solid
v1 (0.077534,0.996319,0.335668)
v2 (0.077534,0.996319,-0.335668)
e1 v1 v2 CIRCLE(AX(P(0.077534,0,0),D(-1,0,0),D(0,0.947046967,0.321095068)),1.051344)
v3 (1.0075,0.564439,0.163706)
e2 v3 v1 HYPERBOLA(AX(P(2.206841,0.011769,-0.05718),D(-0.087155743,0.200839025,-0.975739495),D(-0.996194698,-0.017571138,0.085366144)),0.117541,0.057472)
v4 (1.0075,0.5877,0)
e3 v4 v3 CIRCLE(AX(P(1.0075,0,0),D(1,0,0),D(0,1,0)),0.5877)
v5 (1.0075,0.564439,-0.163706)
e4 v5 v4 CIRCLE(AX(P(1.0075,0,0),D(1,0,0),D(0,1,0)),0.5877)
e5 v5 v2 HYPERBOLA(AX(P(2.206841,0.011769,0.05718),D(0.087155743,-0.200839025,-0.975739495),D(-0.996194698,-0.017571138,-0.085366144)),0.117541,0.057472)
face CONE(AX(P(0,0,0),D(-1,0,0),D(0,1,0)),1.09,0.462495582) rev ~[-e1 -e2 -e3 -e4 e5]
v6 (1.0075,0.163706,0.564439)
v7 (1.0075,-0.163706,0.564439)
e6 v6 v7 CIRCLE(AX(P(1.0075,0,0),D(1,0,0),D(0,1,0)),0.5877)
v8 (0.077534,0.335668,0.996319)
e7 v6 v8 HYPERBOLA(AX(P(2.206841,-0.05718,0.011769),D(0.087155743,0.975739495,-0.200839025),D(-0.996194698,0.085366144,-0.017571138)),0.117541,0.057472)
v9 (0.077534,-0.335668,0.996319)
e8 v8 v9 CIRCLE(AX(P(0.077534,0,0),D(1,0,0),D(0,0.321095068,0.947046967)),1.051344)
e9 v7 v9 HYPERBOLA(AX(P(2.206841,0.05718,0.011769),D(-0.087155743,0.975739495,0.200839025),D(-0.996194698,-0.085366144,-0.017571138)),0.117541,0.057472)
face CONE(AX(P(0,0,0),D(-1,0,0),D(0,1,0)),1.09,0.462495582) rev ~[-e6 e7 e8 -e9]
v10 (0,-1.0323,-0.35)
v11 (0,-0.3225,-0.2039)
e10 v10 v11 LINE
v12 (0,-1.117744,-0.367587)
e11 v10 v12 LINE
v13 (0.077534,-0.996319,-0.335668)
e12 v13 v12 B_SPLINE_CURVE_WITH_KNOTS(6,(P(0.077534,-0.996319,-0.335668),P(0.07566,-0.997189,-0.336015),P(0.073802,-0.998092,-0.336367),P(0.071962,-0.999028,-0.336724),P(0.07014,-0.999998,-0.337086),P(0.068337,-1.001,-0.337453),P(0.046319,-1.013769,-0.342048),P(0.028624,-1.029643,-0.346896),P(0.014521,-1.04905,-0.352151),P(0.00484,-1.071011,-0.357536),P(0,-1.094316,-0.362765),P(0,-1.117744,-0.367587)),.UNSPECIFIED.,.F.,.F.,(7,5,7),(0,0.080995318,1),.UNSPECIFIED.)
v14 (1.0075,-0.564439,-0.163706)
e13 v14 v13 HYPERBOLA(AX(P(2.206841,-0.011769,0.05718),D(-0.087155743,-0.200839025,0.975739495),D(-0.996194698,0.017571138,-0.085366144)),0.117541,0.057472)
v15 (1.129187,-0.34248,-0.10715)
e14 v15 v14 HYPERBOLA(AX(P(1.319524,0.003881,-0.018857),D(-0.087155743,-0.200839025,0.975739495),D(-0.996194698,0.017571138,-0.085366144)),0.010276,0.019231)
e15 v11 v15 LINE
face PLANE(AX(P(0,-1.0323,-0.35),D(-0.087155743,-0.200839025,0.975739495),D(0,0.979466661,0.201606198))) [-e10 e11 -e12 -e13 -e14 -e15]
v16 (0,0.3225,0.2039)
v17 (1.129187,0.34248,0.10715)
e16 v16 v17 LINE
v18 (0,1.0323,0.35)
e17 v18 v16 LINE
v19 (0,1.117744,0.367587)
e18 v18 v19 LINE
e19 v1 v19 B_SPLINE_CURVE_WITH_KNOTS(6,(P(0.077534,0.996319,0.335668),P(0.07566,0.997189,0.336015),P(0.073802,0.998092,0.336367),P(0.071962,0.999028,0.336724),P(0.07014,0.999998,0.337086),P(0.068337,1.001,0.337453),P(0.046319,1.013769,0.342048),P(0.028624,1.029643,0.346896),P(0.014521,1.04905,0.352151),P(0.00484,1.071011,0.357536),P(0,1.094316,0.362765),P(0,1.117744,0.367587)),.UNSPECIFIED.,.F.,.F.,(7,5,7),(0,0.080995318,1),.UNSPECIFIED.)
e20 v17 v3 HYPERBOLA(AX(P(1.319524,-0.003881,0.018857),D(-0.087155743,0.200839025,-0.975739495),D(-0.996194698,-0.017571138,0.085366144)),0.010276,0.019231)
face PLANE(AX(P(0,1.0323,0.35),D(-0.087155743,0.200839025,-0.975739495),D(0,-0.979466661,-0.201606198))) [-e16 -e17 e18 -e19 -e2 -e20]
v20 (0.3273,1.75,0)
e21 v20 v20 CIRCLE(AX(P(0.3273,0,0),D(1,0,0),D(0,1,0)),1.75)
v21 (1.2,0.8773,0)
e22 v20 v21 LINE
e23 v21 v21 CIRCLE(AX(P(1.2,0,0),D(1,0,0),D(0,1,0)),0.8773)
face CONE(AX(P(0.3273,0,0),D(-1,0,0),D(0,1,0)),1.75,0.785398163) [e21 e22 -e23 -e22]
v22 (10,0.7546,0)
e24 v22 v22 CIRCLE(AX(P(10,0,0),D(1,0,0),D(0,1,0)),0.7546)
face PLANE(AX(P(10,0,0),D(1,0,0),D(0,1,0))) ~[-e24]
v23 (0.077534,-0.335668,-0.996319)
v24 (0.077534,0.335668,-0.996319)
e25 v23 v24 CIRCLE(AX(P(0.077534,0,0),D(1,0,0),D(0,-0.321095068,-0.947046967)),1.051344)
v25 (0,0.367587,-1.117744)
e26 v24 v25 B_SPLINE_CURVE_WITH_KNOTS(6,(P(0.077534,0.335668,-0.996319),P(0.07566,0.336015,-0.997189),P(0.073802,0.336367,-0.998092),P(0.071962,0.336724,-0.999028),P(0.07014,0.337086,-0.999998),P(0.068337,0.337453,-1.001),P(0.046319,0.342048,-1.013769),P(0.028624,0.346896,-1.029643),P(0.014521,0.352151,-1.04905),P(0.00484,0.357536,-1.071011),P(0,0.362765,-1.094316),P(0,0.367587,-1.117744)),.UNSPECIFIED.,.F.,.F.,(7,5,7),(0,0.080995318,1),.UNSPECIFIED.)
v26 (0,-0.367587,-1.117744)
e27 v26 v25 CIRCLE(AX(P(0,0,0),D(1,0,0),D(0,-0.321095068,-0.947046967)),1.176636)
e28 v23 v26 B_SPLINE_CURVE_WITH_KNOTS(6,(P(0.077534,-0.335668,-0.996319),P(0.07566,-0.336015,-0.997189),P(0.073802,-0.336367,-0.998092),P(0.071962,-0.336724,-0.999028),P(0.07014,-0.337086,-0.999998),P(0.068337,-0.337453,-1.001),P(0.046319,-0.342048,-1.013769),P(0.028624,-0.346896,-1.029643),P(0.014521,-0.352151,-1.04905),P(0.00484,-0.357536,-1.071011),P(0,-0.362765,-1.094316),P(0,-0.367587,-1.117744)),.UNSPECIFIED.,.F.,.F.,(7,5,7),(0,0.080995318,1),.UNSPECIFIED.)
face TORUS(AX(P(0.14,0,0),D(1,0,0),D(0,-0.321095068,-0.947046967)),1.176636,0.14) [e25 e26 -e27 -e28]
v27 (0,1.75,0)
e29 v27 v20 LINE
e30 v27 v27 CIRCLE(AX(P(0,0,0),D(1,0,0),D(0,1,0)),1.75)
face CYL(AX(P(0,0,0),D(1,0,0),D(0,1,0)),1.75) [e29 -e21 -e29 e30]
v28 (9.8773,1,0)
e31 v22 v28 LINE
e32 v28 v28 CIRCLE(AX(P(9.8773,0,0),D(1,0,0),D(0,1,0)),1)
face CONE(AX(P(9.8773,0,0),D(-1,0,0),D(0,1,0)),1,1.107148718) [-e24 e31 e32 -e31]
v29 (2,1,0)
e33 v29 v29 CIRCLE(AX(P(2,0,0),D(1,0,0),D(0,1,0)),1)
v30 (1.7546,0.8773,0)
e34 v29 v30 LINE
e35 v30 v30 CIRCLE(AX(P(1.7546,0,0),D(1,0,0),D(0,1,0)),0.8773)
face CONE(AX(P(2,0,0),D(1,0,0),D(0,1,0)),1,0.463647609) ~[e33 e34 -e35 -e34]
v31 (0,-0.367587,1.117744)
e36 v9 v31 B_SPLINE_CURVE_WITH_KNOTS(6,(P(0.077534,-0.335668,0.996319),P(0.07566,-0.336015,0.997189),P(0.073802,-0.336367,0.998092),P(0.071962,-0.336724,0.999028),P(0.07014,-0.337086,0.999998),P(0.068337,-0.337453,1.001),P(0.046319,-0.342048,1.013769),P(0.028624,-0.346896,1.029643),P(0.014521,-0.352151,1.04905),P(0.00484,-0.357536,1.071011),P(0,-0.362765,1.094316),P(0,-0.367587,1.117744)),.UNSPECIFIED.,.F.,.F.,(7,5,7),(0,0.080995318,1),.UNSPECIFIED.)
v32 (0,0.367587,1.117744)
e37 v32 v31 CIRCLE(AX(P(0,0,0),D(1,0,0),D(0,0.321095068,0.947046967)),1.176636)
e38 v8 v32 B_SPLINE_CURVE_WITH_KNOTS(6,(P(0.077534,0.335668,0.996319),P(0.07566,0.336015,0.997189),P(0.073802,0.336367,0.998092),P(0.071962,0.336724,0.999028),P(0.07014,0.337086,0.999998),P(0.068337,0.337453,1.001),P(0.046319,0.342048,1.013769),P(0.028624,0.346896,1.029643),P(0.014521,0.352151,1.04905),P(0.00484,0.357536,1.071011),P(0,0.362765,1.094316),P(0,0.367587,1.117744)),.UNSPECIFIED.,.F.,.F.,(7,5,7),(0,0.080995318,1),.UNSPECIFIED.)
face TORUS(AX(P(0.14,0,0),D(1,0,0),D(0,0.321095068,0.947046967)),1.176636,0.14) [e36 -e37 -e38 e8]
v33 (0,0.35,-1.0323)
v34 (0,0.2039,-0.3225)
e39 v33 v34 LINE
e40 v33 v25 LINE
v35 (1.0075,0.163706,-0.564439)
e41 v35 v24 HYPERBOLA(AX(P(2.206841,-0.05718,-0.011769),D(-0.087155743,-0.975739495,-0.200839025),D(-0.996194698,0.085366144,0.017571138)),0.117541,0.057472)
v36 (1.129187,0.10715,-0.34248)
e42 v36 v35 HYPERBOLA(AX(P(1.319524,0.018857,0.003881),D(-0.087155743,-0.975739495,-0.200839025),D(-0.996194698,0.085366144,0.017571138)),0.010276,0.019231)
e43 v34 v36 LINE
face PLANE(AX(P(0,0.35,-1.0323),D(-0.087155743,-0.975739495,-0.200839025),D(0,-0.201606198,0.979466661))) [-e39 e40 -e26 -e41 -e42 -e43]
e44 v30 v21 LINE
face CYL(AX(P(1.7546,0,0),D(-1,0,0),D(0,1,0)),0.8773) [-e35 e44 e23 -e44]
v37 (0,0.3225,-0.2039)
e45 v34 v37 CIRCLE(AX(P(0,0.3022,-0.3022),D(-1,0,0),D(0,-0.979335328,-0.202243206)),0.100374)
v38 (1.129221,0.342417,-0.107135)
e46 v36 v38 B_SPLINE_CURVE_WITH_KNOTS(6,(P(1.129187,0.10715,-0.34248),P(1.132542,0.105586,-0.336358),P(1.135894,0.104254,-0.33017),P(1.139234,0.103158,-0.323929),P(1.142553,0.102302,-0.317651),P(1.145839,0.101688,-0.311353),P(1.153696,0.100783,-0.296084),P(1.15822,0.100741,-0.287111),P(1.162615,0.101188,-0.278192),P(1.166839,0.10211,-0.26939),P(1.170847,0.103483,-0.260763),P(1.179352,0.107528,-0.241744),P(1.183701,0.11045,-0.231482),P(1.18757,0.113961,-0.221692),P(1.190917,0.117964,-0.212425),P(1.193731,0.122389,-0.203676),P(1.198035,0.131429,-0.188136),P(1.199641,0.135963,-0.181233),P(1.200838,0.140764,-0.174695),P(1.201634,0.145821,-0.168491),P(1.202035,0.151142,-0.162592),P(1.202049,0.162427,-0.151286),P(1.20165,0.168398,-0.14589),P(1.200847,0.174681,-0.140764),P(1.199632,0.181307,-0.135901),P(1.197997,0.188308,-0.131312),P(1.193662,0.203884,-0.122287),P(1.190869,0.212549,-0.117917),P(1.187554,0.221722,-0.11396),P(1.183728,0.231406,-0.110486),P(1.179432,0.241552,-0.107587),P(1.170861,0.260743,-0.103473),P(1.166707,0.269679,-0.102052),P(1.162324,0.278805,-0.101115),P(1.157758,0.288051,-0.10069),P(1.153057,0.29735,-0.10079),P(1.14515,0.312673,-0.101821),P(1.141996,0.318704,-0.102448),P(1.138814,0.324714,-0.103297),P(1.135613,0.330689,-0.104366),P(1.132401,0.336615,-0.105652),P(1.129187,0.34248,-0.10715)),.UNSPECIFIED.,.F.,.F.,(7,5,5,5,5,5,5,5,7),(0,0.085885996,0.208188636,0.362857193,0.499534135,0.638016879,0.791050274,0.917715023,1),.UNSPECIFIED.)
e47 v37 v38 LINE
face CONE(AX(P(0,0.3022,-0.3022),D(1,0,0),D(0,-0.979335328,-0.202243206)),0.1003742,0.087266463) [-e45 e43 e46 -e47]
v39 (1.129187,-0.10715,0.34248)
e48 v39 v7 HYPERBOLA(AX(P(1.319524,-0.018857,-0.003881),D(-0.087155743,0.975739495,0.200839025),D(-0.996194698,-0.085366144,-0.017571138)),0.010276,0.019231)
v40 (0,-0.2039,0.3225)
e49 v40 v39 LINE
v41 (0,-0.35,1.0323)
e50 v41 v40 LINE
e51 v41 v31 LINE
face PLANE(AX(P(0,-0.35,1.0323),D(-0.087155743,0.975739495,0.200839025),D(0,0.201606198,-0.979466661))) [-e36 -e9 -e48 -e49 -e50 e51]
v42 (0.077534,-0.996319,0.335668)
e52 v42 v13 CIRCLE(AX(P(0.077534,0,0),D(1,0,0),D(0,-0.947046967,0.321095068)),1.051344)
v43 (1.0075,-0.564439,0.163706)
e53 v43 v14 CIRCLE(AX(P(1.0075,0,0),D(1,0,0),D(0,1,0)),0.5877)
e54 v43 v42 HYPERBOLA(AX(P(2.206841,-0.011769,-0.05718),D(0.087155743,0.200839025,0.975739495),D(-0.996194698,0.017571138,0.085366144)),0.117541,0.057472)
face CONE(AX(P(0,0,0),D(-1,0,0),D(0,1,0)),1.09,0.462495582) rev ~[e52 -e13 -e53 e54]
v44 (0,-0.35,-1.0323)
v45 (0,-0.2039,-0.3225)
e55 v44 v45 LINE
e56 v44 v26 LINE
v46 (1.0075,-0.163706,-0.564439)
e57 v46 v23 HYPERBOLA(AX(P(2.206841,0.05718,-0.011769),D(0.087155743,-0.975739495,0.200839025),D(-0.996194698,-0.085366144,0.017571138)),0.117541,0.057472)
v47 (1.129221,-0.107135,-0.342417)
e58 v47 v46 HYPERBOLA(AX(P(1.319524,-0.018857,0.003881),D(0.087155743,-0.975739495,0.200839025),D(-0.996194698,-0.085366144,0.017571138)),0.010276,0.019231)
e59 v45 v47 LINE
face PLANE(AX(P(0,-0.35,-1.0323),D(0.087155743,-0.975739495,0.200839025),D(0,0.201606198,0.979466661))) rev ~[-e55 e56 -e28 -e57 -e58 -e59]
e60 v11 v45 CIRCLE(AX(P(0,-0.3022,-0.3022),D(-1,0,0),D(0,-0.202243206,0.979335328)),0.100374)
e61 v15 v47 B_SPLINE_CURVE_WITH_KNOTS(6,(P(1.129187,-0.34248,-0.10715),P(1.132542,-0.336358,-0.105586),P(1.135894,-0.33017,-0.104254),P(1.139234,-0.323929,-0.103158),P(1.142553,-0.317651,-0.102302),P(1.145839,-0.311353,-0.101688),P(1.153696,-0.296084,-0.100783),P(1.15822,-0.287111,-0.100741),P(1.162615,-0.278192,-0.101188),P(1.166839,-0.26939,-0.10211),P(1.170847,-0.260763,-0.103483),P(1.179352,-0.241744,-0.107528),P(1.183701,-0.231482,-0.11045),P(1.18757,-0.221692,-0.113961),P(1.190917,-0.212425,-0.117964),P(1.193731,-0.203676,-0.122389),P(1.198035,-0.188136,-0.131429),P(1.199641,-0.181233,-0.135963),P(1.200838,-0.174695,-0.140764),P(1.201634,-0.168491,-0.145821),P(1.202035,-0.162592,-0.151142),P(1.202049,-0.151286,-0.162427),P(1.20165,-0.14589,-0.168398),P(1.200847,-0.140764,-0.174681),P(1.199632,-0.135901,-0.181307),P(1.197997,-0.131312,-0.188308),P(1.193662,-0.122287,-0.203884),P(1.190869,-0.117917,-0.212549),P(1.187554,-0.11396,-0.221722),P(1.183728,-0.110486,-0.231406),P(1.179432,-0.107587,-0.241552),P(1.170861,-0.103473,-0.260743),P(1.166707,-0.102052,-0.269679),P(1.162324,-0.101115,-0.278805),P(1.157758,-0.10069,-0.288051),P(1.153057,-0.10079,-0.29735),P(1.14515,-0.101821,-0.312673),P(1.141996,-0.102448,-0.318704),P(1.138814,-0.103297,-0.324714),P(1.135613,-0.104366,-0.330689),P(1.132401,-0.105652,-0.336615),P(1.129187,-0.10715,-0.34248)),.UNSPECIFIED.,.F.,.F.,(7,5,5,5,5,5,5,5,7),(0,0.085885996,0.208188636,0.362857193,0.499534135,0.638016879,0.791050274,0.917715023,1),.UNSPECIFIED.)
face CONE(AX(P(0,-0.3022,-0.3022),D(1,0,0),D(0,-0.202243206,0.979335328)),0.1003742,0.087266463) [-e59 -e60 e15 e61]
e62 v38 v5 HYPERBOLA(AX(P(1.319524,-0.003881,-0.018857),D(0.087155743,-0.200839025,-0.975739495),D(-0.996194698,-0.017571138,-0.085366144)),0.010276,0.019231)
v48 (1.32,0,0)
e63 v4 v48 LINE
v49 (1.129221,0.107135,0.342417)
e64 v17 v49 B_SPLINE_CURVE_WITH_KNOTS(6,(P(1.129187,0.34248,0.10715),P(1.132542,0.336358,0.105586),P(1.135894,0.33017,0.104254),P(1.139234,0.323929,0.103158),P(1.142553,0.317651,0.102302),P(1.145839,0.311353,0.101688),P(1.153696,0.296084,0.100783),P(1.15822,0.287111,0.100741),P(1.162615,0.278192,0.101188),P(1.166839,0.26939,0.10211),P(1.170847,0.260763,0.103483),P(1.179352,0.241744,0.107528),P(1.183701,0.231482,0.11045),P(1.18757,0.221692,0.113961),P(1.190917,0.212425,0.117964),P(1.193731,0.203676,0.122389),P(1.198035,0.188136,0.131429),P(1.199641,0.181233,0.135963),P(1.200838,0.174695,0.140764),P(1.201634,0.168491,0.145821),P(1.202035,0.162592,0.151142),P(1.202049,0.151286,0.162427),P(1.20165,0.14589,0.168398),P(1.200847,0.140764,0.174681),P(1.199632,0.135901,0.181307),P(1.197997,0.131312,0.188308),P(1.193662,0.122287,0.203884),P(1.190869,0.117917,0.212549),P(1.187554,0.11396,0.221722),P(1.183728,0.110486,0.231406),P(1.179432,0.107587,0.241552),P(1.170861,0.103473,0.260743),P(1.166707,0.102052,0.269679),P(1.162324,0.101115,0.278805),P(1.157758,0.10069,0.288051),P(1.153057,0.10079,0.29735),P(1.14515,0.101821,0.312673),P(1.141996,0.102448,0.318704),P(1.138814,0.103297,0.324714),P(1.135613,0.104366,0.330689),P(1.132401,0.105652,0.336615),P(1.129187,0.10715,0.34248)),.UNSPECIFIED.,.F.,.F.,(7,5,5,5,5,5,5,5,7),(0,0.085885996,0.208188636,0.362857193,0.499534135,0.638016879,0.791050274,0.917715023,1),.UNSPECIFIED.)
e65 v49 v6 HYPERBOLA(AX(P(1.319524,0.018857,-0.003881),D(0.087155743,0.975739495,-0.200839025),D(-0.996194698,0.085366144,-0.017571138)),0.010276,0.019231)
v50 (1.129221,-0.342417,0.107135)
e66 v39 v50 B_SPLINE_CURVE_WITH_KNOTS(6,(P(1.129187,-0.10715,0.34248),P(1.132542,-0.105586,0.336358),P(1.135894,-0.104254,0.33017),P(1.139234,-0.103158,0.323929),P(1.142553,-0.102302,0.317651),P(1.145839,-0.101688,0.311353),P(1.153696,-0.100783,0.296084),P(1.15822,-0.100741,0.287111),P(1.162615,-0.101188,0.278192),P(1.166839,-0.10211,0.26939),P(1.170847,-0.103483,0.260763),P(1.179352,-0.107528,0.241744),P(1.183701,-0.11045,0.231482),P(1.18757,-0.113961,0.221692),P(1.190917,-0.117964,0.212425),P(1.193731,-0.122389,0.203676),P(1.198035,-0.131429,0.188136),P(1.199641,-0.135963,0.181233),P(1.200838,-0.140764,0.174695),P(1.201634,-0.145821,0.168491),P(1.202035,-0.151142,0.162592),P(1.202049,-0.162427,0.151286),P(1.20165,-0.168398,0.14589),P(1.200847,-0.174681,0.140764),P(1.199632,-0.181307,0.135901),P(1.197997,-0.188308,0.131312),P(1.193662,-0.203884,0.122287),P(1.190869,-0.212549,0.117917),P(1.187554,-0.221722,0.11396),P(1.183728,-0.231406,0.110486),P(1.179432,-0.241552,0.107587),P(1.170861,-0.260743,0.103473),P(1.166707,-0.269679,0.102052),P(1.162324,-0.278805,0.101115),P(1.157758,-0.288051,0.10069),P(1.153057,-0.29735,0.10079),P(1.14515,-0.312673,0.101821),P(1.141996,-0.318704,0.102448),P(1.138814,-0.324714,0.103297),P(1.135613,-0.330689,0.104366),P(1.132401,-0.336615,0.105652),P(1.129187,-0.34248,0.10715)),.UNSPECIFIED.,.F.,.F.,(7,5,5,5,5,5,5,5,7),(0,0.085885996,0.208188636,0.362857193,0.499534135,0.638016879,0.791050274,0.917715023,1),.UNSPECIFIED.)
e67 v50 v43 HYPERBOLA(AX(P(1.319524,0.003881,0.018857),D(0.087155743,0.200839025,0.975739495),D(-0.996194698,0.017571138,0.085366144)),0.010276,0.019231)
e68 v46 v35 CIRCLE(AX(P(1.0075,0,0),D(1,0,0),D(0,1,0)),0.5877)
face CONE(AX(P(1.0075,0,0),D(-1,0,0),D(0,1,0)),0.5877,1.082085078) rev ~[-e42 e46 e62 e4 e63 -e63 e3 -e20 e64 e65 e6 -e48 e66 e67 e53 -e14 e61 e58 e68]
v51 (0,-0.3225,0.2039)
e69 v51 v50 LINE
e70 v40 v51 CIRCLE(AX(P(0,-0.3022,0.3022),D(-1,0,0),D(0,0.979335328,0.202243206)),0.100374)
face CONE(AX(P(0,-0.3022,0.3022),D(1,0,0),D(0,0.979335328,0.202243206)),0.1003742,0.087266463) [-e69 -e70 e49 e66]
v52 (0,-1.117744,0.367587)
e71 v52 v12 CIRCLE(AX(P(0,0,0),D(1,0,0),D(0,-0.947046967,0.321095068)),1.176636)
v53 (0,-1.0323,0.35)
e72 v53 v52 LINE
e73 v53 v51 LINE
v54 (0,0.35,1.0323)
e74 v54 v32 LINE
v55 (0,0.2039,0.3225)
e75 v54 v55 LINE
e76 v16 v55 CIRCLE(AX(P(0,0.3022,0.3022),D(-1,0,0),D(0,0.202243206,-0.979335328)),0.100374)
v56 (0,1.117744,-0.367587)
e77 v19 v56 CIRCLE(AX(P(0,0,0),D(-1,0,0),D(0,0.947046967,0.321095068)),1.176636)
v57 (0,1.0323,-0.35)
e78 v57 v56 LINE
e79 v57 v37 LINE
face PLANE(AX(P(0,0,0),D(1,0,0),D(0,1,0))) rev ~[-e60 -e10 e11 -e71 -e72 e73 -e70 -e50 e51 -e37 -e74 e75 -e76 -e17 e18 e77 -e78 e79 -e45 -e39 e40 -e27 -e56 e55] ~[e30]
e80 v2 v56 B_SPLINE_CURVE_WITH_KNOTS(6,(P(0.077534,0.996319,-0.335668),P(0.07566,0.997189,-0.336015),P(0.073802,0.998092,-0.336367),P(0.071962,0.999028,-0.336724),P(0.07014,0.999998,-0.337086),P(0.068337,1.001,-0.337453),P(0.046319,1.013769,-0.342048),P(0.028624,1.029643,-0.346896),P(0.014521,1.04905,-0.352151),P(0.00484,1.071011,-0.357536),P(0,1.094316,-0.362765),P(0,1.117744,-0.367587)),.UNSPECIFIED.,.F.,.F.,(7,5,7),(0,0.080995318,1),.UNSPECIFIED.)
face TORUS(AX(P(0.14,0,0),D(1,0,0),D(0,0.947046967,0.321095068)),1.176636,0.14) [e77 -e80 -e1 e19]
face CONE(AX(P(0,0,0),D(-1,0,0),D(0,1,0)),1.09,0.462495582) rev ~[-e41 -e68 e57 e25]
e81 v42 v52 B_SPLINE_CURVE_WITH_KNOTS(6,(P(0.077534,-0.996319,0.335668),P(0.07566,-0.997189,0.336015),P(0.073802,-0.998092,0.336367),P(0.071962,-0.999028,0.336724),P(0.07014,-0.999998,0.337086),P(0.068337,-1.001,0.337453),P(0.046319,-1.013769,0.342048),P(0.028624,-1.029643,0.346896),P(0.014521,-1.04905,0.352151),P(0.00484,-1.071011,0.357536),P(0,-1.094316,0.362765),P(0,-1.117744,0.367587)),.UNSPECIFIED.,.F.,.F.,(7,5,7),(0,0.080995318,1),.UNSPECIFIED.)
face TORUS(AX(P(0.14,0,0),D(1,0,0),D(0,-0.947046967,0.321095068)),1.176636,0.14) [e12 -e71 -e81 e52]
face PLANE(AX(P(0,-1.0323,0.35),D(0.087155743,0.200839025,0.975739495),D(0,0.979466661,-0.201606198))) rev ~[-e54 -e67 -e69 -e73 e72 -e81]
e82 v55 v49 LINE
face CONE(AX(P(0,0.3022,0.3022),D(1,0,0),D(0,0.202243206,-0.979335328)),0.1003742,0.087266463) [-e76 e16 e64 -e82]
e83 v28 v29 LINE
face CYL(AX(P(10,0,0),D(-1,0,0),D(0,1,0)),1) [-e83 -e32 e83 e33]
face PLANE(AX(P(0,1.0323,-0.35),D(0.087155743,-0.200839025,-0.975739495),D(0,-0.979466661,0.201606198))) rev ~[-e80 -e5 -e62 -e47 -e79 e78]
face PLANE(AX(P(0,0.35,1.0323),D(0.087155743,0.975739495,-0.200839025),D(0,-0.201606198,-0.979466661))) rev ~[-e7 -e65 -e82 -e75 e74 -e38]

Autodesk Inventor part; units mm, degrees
ref_plane "YZ Plane" through (0, 0, 0) normal (1, 0, 0) x (0, 1, 0)
ref_plane "XZ Plane" through (0, 0, 0) normal (0, 1, 0) x (-1, 0, 0)
sketch "Sketch1" plane through (0, 0, 0) normal (0, 0, 1) x (1, 0, 0)
  line L0 (1.32, 0) -> (10, 0)
  line L1 (10, 0) -> (10, 1)
  line L2 (10, 1) -> (2, 1)
  line L3 (2, 1) -> (1.7546, 0.8773)
  line L4 (1.7546, 0.8773) -> (1.2, 0.8773)
  line L5 (0, 1.75) -> (0, 1.09)
  line L6 (0, 1.09) -> (1.0075, 0.5877)
  line L7 (1.0075, 0.5877) -> (1.32, 0)
  line L8 (-2, 0) -> (12, 0) projected
  line L9 (0, -0.35) -> (0, 2.1) projected
  line L10 (0, 1.75) -> (0.3273, 1.75)
  line L11 (0.3273, 1.75) -> (1.2, 0.8773)
  line L12 (2, 1) -> (1.0773, 1) construction
  dimension "d1" = 8
  dimension "d2" = 2
  dimension "d3" = 1.7546
  dimension "d4" = 2.18
  dimension "d5" = 26.5
  dimension "d6" = 62
  dimension "d7" = 1.32
  dimension "d8" = 0.2454
  dimension "d12" = 3.5
  dimension "d13" = 45
  dimension "d15" = 10
  dimension "d24" = 1.2
revolve "Body" add sketch "Sketch1" angle 360 about axis through (1.32, 0, 0) along (1, 0, 0) contours L7 L6 L5 L10 L11 L4 L3 L2 L1 L0
sketch "Sketch2" plane through (0, 0, 0) normal (-1, 0, 0) x (0, 0, 1)
  line L0 (0, 1.09) -> (0, 0) construction
  line L1 (0, 0) -> (1.09, 0) construction
  arc A0 (0.327, 0) -> (0, 0.327) centre (0, 0) ccw construction
  arc A1 (0.3815, 0) -> (0, 0.3815) centre (0, 0) ccw construction
  arc A2 (1.0323, 0.35) -> (0.35, 1.0323) centre (0, 0) ccw
  line L2 (0, 0) -> (0.7707, 0.7707) construction
  line L3 (0.35, 1.0323) -> (0.2039, 0.3225)
  line L4 (1.0323, 0.35) -> (0.3225, 0.2039)
  arc A3 (0.35, 1.0323) -> (0, 1.09) centre (0, 0) ccw
  arc A4 (1.09, 0) -> (1.0323, 0.35) centre (0, 0) ccw
  line L5 (0, -2.45) -> (0, 2.45) projected
  line L6 (-2.45, 0) -> (2.45, 0) projected
  arc A5 (0.35, -1.0323) -> (1.0323, -0.35) centre (0, 0) ccw
  line L7 (0.35, -1.0323) -> (0.2039, -0.3225)
  line L8 (1.0323, -0.35) -> (0.3225, -0.2039)
  arc A6 (0, -1.09) -> (0.35, -1.0323) centre (0, 0) ccw
  arc A7 (1.0323, -0.35) -> (1.09, 0) centre (0, 0) ccw
  arc A8 (-0.35, 1.0323) -> (-1.0323, 0.35) centre (0, 0) ccw
  line L9 (-0.35, 1.0323) -> (-0.2039, 0.3225)
  line L10 (-1.0323, 0.35) -> (-0.3225, 0.2039)
  arc A9 (0, 1.09) -> (-0.35, 1.0323) centre (0, 0) ccw
  arc A10 (-1.0323, 0.35) -> (-1.09, 0) centre (0, 0) ccw
  arc A11 (-0.35, -1.0323) -> (0, -1.09) centre (0, 0) ccw
  arc A12 (-1.0323, -0.35) -> (-0.35, -1.0323) centre (0, 0) ccw
  arc A13 (-1.09, 0) -> (-1.0323, -0.35) centre (0, 0) ccw
  line L11 (-1.0323, -0.35) -> (-0.3225, -0.2039)
  line L12 (-0.35, -1.0323) -> (-0.2039, -0.3225)
  arc A14 (0.2039, 0.3225) -> (0.3225, 0.2039) centre (0.3022, 0.3022) ccw
  arc A15 (0.3225, -0.2039) -> (0.2039, -0.3225) centre (0.3022, -0.3022) ccw
  arc A16 (-0.3225, 0.2039) -> (-0.2039, 0.3225) centre (-0.3022, 0.3022) ccw
  arc A17 (-0.2039, -0.3225) -> (-0.3225, -0.2039) centre (-0.3022, -0.3022) ccw
  point P0 (0.7707, -0.7707)
  point P1 (-0.7707, 0.7707)
  point P2 (-0.7707, -0.7707)
  dimension "d17" = 0.654
  dimension "d18" = 0.763
  dimension "d19" = 2.18
  dimension "d20" = 45
  dimension "d21" = 0.35
extrude "Slot" add sketch "Sketch2" against normal up to next draft 5 contours L4 A14 L3 A2 | A5 L7 A15 L8 | L9 A16 L10 A8 | A12 L11 A17 L12
fillet "Fillet1" radius 0.14 4 edges at (0, 1.09, 0) (0, 0, -1.09) (0, -1.09, 0) (0, 0, 1.09)
thread "Thread" size "M2x0.4" class "6g" standard "ISO Metric profile" length 8
chamfer "Chamfer1" distance 0.2454 distance2 0.1227 1 edges at (10, -1, 0) measured on face at (10, -0.0858, 0.7069)
ref_plane "Work Plane2" through (3.35, 0, 0) normal (0, 0, -1) x (1, 0, 0)
equation "\"d17\" = 0.3 * SDM"
equation "\"d18\" = 0.35 * SDM"
equation "\"d19\" = SDM"
equation "\"d21\" = 0.5 * SBR"
equation "\"d1\" = GEL"
equation "\"d2\" = GD"
equation "\"d3\" = BDM"
equation "\"d4\" = SDM"
equation "\"d7\" = INTI"
equation "\"d8\" = GAL"
equation "\"d12\" = KOD"
equation "\"d13\" = 0.5 * SEWI"
equation "\"d15\" = NLG"
equation "\"d24\" = KOH"
equation "\"d23\" = 0.2 * SBR"
equation "\"d10\" = GEL"
equation "\"d25\" = -0.5 * SPD + 0.5 * GD"
equation "\"d26\" = 0.5 * GAL"
equation "\"NLG\" = 10"
equation "\"GEL\" = 8"
equation "\"GAL\" = 0.61345 * PTC"
equation "\"SPD\" = NND - 1.2269 * PTC"
equation "\"KOD\" = 3.5"
equation "\"KOH\" = 1.2"
equation "\"SBR\" = 0.7"
equation "\"INTI\" = 1.32"
equation "\"SDM\" = 2.18"
equation "\"GD\" = NND"
equation "\"BDM\" = NND - GAL"
equation "\"SEWI\" = 90deg"
equation "\"d9\" = SDM"
equation "\"GUL\" = 0.61345 * PTC"
equation "\"TOA\" = 30deg"
equation "\"EPV\" = 2.2"
equation "\"THREADDIA\" = 2"
equation "\"RR\" = 0.2"
equation "\"PTC\" = 0.4"
equation "\"NND\" = 2"
equation "\"GD1\" = THREADDIA - 1.2269 * PTC"
properties part number "AS 1427 - M2 x 10" material "Steel, Mild"
